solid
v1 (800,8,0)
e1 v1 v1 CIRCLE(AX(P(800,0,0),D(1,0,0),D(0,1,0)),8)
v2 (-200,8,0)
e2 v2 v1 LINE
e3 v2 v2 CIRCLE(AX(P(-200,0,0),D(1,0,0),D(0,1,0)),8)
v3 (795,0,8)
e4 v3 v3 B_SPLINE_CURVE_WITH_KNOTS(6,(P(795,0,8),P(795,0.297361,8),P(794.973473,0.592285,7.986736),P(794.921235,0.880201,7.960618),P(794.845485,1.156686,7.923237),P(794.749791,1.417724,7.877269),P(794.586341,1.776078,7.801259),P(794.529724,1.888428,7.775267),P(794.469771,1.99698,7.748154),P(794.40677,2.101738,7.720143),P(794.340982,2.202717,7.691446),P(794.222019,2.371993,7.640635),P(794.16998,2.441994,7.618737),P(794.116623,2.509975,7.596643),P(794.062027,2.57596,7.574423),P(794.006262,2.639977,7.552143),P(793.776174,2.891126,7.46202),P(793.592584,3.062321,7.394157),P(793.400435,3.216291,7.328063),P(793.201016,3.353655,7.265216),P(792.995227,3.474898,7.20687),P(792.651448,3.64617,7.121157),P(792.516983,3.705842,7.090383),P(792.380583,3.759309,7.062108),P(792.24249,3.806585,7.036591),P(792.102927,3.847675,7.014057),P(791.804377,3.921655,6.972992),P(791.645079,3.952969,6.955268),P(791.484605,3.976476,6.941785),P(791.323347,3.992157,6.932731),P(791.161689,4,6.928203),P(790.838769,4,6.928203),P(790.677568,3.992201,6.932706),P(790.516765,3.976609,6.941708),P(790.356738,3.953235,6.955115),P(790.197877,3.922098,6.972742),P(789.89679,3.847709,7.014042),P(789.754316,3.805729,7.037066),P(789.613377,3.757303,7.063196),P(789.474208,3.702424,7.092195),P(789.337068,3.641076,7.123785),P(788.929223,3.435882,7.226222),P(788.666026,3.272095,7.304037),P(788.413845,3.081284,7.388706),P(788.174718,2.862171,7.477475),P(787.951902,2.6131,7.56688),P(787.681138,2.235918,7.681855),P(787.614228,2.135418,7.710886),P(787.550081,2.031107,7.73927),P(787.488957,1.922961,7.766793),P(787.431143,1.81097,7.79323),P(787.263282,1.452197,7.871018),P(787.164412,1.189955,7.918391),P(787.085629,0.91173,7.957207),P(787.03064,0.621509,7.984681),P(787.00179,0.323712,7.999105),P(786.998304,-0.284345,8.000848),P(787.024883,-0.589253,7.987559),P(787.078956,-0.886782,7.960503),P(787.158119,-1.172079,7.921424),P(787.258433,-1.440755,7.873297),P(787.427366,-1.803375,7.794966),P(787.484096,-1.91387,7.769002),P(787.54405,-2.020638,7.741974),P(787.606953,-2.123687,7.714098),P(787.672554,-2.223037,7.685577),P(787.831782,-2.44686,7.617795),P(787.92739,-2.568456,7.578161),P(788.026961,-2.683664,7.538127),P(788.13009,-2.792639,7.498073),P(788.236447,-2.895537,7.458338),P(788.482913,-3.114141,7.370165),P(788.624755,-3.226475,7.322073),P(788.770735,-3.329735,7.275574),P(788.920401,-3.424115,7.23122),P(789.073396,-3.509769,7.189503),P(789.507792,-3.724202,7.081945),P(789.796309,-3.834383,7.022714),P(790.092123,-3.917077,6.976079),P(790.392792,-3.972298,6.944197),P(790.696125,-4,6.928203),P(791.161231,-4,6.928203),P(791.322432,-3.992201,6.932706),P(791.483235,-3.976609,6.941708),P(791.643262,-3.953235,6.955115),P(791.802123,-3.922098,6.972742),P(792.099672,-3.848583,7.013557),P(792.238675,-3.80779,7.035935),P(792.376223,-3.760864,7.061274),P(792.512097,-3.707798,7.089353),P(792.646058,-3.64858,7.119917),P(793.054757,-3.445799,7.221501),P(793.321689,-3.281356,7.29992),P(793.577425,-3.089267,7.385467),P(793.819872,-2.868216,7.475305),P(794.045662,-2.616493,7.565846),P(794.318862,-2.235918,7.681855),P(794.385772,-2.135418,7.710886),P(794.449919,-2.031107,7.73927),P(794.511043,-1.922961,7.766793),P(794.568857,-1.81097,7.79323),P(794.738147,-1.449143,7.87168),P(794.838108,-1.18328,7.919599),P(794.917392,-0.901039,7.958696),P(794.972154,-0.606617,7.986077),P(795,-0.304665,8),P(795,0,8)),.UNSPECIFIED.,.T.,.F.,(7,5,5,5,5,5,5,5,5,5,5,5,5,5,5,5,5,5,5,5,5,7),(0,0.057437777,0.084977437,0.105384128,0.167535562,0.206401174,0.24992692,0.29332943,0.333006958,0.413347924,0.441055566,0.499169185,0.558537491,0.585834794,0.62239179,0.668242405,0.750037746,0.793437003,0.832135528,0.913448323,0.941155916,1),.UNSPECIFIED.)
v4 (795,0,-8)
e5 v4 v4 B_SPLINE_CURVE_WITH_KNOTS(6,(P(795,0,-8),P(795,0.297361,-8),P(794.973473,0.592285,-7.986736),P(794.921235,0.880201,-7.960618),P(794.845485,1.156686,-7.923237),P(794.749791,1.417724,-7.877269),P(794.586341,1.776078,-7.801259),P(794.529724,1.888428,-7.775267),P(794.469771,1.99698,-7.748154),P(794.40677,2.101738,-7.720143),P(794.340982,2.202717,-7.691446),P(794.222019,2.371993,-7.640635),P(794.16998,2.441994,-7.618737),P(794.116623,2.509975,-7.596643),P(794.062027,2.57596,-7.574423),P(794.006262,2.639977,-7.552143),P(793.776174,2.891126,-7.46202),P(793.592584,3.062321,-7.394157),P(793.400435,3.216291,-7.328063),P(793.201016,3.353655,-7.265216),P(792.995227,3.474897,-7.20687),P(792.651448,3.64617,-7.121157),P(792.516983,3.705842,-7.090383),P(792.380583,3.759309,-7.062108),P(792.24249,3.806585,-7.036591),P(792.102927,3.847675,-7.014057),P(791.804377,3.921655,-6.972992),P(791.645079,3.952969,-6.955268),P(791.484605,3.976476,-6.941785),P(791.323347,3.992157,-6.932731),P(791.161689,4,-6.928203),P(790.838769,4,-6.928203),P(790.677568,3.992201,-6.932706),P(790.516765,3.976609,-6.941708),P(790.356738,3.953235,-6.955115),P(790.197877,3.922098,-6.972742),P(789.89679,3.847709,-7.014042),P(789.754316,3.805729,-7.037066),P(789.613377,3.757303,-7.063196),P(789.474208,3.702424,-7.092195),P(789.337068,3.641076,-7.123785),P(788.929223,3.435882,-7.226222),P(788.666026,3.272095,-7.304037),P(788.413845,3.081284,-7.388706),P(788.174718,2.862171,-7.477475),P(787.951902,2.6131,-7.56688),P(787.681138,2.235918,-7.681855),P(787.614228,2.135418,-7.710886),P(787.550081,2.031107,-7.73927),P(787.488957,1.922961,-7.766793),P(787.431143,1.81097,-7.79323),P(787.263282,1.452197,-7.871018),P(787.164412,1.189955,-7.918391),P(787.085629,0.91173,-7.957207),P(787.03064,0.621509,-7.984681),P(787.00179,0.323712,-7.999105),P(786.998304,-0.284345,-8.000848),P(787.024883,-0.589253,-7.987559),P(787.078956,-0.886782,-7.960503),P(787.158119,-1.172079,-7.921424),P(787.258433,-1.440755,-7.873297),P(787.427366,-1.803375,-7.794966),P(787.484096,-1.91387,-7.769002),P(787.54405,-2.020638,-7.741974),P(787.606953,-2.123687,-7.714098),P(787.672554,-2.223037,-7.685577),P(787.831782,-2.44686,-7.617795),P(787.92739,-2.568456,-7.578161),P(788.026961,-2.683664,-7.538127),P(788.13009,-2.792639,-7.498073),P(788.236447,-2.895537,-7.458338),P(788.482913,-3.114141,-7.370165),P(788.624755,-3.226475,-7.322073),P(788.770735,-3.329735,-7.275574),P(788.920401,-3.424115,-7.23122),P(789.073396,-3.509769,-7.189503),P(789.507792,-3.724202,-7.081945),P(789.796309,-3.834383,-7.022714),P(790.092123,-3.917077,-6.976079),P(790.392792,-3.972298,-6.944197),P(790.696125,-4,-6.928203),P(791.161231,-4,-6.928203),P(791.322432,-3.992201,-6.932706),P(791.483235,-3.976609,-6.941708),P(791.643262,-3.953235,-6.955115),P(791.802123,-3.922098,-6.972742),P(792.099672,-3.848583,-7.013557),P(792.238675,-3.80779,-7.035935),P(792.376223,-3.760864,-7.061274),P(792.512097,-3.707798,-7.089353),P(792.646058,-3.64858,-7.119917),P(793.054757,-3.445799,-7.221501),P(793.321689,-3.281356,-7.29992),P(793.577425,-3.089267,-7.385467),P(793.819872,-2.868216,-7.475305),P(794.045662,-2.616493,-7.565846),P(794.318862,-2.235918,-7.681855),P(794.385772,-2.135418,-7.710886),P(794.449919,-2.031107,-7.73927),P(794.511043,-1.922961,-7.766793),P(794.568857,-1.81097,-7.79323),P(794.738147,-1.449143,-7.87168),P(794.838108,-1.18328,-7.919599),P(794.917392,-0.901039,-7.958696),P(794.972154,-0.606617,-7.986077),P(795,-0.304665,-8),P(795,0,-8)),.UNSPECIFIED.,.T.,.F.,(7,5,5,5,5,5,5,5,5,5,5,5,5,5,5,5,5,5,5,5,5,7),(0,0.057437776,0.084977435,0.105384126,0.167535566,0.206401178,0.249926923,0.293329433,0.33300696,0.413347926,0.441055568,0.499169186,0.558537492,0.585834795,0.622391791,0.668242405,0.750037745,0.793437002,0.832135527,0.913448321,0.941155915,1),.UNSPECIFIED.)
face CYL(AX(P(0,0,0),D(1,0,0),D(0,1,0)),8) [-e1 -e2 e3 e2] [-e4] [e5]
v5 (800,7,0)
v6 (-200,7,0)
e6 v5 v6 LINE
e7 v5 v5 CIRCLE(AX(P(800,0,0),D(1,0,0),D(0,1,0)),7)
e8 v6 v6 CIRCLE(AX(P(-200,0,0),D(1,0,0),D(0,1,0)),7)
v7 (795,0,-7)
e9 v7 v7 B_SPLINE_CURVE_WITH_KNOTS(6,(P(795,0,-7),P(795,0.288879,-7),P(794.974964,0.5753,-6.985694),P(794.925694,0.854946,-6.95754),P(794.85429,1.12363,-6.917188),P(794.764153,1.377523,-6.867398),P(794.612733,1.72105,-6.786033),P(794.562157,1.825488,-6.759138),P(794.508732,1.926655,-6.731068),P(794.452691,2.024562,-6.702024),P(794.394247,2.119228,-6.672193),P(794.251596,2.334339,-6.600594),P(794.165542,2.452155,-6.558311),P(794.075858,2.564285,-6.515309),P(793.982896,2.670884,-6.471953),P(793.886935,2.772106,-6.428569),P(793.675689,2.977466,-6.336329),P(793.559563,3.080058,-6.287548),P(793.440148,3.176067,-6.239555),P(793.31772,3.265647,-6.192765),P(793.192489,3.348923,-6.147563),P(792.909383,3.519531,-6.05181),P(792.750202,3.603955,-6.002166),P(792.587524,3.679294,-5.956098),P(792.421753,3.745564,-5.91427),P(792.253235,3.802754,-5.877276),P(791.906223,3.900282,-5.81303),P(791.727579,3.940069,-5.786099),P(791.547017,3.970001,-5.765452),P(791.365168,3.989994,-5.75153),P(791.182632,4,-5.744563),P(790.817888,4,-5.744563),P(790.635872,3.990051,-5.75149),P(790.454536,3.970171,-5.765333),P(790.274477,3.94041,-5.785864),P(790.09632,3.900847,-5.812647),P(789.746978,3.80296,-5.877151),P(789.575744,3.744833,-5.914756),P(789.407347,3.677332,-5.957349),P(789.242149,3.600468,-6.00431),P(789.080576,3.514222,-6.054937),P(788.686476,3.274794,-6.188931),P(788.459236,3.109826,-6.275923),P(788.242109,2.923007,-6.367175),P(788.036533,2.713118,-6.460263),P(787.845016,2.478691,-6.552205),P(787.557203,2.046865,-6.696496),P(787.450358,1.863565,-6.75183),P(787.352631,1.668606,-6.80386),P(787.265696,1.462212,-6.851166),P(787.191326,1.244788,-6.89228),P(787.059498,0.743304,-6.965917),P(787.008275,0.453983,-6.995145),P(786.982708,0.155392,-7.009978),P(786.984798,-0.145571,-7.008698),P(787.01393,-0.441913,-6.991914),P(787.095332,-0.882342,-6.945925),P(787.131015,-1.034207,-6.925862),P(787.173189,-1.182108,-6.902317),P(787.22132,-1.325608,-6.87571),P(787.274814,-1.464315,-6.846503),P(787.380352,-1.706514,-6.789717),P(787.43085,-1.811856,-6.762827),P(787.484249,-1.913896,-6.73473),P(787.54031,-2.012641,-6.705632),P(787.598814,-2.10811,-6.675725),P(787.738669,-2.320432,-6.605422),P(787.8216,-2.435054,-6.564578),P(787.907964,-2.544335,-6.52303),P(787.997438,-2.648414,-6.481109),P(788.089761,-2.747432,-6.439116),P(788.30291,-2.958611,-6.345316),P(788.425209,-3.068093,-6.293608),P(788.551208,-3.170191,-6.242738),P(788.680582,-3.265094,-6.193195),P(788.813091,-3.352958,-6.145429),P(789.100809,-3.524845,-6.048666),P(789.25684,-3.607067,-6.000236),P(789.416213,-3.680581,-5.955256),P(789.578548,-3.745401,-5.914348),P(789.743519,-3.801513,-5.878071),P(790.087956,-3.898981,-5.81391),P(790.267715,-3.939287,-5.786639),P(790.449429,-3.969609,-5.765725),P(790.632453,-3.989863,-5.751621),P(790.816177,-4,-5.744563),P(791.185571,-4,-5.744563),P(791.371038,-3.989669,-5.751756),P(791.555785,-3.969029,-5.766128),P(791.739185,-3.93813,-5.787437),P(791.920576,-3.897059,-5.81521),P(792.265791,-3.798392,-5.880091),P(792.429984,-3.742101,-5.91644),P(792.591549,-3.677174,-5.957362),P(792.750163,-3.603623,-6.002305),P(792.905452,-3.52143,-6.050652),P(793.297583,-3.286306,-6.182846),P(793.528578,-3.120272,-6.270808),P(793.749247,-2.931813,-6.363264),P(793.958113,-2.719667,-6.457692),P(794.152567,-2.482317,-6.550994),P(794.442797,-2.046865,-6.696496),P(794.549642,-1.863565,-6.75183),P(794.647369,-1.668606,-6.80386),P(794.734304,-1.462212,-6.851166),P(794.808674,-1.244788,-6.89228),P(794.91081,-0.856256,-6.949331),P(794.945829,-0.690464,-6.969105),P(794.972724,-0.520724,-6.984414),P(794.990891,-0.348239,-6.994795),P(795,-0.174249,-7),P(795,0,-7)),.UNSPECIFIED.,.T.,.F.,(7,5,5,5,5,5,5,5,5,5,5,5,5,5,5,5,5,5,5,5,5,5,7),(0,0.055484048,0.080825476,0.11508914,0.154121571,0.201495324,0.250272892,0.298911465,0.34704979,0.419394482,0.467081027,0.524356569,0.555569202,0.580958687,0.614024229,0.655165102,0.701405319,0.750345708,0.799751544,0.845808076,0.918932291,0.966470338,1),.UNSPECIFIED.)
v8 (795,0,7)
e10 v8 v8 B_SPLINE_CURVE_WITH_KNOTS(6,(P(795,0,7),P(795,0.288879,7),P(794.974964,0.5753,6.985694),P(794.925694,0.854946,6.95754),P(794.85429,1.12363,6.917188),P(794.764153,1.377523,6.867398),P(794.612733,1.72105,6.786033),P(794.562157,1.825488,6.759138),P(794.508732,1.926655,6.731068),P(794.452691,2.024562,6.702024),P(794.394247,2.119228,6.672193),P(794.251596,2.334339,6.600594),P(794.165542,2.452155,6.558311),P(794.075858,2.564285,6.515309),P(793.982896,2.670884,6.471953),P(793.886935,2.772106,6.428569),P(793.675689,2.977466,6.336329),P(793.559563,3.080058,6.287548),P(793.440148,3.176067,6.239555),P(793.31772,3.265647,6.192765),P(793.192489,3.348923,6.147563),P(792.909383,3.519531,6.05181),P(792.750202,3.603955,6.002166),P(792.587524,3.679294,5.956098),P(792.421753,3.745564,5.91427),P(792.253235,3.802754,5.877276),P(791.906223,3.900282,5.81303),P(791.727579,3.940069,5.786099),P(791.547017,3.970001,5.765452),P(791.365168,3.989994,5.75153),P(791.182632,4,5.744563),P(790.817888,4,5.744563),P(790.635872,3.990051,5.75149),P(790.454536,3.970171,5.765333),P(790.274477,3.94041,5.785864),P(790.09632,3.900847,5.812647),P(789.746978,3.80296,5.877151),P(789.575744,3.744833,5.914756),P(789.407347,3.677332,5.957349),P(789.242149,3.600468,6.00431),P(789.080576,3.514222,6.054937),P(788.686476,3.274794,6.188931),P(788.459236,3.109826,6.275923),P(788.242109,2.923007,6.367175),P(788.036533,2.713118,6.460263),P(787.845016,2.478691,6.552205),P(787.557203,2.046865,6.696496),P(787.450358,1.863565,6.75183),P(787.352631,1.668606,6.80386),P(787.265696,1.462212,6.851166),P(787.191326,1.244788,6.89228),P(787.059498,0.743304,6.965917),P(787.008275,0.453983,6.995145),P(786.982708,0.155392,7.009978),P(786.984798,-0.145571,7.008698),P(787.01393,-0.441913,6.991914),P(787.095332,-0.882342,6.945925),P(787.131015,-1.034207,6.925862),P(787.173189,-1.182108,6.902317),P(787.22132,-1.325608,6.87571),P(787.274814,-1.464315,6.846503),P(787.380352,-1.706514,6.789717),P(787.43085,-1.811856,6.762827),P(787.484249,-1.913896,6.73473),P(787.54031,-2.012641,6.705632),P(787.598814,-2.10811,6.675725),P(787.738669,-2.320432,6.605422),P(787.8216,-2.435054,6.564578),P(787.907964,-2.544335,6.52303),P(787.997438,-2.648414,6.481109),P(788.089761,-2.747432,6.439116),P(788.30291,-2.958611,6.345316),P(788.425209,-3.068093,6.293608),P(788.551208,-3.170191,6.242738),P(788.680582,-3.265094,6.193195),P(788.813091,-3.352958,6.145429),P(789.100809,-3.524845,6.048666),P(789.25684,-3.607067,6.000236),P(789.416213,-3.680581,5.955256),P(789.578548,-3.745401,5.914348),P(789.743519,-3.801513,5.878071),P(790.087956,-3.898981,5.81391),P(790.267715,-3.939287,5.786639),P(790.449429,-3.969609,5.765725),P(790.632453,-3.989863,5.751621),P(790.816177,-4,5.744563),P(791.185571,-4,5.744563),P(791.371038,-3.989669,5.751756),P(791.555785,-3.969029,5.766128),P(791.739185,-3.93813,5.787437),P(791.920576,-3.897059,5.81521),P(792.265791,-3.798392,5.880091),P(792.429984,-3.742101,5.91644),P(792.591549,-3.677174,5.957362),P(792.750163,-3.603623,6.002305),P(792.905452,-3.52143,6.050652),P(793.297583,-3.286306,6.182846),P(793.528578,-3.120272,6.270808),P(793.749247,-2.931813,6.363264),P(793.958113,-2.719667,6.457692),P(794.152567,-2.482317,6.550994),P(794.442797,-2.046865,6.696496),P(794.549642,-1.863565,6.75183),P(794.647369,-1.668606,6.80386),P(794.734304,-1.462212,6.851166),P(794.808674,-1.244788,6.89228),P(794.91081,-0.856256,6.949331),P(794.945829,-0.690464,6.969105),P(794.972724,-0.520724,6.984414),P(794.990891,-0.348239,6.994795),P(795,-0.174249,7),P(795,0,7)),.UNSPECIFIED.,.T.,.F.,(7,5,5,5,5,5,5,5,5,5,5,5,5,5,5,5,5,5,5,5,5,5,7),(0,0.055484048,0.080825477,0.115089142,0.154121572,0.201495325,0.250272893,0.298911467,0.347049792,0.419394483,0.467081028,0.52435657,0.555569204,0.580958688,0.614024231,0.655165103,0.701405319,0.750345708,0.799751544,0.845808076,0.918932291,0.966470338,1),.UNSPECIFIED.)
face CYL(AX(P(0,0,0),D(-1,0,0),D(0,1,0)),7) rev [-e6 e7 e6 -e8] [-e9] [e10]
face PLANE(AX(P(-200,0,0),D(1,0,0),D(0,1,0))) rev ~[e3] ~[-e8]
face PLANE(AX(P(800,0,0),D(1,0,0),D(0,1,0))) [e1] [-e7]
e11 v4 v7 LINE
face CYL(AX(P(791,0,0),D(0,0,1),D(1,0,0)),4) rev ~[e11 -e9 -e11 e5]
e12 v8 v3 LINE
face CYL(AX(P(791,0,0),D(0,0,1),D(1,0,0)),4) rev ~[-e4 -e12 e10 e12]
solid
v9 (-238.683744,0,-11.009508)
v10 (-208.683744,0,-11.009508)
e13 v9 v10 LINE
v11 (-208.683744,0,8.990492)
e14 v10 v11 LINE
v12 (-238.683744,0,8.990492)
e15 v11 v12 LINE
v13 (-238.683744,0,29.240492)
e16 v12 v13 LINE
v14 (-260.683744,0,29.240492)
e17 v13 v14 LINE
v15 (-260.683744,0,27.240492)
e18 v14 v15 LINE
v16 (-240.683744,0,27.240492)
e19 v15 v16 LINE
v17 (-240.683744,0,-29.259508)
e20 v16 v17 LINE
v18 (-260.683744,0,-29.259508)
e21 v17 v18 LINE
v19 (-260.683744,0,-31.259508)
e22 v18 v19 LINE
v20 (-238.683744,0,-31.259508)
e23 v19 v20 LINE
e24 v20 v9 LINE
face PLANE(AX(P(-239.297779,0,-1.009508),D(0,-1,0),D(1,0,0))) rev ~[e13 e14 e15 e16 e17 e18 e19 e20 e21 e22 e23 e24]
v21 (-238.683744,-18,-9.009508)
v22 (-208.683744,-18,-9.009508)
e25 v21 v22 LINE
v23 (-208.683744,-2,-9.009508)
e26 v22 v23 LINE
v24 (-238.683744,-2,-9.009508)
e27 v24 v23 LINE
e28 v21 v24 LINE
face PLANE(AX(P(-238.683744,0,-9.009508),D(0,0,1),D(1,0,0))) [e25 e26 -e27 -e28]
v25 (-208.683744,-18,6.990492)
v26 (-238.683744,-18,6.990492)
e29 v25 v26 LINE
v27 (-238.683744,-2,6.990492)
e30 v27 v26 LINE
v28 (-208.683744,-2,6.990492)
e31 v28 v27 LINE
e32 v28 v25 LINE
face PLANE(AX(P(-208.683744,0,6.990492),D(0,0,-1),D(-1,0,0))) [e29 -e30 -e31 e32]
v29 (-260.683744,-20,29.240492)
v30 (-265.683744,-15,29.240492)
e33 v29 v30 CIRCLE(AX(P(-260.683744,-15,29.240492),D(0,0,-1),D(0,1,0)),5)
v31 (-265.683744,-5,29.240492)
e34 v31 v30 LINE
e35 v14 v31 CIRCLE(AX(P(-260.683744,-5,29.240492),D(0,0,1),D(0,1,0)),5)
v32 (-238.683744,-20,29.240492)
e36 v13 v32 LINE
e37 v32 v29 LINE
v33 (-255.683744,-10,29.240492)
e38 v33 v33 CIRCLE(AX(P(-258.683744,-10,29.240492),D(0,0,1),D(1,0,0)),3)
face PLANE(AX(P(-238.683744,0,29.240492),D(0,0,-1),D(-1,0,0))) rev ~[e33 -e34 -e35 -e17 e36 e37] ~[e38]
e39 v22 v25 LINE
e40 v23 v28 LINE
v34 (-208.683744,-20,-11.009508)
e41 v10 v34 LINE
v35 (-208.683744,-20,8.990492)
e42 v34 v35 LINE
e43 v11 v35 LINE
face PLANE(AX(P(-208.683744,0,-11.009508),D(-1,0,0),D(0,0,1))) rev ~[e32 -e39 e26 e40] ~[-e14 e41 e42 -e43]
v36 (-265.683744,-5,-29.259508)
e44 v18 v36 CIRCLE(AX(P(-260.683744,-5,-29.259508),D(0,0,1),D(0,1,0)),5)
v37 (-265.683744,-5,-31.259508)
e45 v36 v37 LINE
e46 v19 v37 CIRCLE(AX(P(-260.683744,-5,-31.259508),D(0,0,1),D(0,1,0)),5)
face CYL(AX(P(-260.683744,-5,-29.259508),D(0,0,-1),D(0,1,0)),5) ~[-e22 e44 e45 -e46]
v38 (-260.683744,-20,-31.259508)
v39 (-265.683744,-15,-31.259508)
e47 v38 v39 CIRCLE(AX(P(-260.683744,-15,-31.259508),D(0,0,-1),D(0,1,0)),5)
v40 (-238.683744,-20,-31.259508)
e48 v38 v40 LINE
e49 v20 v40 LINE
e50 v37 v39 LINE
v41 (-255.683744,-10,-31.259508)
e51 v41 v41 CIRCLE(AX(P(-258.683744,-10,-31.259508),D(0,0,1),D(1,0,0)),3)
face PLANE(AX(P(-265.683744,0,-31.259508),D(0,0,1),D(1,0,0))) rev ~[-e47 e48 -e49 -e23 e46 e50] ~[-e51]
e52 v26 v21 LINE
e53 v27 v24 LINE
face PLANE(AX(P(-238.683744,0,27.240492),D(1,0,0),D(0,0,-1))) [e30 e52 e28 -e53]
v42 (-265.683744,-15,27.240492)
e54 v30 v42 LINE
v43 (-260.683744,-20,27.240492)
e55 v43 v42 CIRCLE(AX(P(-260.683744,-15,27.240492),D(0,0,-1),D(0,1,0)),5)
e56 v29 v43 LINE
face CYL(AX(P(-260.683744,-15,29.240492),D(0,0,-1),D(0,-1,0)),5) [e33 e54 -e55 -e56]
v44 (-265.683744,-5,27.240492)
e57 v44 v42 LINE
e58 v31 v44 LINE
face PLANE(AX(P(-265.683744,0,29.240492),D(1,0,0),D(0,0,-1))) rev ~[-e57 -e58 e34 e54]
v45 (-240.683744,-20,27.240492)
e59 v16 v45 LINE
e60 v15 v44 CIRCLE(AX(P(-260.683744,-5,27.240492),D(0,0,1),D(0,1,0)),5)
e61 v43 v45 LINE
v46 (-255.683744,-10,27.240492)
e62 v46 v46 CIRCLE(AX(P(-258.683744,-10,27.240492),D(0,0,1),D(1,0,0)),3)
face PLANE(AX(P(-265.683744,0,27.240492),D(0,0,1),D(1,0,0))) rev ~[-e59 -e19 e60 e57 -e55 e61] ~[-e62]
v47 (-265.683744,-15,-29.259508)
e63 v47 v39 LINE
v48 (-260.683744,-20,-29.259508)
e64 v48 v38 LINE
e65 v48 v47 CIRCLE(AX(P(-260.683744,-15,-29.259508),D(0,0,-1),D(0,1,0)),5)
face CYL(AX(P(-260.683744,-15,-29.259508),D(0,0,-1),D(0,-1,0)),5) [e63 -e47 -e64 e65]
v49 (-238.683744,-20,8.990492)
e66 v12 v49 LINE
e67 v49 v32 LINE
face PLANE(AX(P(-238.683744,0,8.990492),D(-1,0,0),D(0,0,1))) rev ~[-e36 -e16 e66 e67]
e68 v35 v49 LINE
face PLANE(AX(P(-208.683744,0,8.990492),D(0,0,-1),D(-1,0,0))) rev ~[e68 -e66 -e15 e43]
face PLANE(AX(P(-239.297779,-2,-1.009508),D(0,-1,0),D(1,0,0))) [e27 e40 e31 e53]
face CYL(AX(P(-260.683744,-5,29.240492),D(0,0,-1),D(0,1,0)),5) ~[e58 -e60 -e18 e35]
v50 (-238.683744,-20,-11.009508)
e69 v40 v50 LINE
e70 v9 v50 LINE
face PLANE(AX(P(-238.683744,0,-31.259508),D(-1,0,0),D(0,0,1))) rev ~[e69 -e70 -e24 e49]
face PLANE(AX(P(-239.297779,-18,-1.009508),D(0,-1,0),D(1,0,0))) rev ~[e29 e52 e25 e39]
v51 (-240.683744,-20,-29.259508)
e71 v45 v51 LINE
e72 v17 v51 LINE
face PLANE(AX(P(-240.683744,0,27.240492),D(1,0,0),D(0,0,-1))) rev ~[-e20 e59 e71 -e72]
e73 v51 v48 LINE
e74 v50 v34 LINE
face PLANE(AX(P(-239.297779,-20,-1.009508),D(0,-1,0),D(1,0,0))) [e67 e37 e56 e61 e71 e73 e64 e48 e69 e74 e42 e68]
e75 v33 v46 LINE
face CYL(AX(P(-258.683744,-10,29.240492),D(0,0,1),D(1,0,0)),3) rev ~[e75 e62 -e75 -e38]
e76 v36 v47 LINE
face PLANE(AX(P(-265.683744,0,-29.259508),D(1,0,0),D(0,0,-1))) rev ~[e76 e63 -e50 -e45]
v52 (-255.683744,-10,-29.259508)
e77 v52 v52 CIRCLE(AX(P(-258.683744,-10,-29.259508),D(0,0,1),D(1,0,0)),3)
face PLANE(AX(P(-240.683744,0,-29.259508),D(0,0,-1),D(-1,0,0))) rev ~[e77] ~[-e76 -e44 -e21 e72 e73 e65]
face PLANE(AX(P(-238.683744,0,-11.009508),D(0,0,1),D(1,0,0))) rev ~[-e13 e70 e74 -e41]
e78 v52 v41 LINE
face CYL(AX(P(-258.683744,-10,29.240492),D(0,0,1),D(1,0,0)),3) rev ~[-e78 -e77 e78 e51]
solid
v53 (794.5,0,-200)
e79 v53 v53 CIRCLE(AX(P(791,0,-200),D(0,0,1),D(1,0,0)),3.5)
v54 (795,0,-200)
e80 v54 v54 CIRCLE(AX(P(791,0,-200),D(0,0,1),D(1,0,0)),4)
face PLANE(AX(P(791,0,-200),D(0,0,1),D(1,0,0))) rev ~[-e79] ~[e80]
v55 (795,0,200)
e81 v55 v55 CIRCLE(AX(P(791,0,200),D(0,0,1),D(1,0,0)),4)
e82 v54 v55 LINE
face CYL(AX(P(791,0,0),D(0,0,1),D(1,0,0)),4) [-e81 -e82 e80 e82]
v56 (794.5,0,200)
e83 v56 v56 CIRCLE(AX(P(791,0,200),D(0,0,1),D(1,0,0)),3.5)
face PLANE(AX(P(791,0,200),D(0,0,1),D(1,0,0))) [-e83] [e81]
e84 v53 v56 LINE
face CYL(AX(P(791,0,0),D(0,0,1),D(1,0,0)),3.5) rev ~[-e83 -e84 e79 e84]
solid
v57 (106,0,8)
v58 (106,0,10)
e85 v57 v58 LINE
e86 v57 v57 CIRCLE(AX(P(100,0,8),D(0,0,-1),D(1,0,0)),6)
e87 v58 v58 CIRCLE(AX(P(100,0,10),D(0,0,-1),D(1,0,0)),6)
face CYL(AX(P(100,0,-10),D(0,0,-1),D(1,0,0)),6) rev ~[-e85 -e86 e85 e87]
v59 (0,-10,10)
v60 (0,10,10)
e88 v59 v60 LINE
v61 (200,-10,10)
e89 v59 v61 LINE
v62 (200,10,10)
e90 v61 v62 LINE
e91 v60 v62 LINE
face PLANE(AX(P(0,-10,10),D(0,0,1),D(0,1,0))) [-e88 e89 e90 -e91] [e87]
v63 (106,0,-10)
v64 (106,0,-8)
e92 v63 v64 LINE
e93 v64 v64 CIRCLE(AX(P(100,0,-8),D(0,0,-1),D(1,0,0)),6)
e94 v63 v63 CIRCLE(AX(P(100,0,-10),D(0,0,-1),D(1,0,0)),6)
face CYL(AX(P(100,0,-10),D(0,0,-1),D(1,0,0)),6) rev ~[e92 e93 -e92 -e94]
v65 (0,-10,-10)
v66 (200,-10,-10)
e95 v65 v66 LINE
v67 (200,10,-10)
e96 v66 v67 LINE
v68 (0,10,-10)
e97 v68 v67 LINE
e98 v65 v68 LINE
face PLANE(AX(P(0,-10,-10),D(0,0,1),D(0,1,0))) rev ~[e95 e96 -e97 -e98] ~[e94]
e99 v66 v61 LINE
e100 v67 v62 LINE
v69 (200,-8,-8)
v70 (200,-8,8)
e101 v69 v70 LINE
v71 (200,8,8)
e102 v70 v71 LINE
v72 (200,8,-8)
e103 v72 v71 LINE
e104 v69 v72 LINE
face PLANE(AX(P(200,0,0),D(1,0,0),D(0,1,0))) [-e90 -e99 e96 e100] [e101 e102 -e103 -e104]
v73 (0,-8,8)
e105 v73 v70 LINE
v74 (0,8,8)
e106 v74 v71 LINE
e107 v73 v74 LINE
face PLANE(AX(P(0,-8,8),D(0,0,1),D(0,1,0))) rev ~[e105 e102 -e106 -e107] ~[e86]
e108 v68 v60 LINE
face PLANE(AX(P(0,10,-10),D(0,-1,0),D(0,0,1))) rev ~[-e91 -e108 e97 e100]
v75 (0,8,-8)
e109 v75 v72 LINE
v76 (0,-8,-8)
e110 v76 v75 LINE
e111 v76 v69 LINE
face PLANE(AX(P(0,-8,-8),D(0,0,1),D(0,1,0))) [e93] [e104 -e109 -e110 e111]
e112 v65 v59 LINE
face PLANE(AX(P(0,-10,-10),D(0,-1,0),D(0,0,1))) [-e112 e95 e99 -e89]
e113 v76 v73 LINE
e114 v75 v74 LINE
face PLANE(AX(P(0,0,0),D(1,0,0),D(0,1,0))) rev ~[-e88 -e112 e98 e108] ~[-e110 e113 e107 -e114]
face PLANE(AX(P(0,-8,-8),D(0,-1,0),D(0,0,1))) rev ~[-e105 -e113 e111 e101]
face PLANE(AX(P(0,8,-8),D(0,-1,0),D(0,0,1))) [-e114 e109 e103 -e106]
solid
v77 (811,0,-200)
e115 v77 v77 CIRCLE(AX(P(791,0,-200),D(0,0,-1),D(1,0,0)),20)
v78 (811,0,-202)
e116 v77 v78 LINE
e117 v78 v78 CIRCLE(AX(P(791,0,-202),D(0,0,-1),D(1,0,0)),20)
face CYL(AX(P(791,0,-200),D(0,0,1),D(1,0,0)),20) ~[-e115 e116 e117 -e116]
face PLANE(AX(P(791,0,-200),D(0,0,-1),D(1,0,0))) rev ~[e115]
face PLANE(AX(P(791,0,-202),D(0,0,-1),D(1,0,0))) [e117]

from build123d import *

# Parameters (mm, degrees)
F0_W          = 20
F0_H          = 20
F0_W_2        = 16
F0_H_2        = 16
F1_DEPTH      = 200
F2_R          = 8
F2_R_2        = 7
F3_DEPTH      = 800
F3_DEPTH_BACK = 200
F4_R          = 6
F5_DEPTH      = 25
F6_R          = 4
F7_DEPTH      = 12.5
F8_DEPTH      = 200
F9_T          = -0.5
F10_R         = 20
F11_DEPTH     = 2
F13_DEPTH     = 20
F14_T         = -2
F15_R         = 3
F16_DEPTH     = 231.2414921874
F17_R         = 5


with BuildPart() as f1:
    # F0 (on Right) → F1 (new body)
    with BuildSketch(Plane.YZ):
        Rectangle(F0_W, F0_H)
        Rectangle(F0_W_2, F0_H_2, mode=Mode.SUBTRACT)
    extrude(amount=F1_DEPTH)

    # F4 (on face) → F5 (cut)
    with BuildSketch(Plane(origin=(0, 0, -10), x_dir=(1, 0, 0), z_dir=(0, 0, -1))):
        with Locations((100, 0)):
            Circle(F4_R)
    extrude(amount=-F5_DEPTH, mode=Mode.SUBTRACT)


with BuildPart() as f3:
    # F2 (on Right) → F3 (new body, two sides)
    with BuildSketch(Plane.YZ) as f3_sk:
        Circle(F2_R)
        Circle(F2_R_2, mode=Mode.SUBTRACT)
    extrude(amount=F3_DEPTH)
    extrude(f3_sk.sketch, amount=-F3_DEPTH_BACK)

    # F6 (on Top) → F7 (cut, symmetric)
    with BuildSketch(Plane.XY):
        with Locations((791, 0)):
            Circle(F6_R)
    extrude(amount=F7_DEPTH, both=True, mode=Mode.SUBTRACT)


with BuildPart() as f8:
    # F6 (on Top) → F8 (new body, symmetric)
    with BuildSketch(Plane.XY):
        with Locations((791, 0)):
            Circle(F6_R)
    extrude(amount=F8_DEPTH, both=True)

    # F9
    f9_openings = [f8.faces().sort_by_distance(p)[0] for p in [
        (791, 0, 200),
        (791, 0, -200),
    ]]
    offset(amount=F9_T, openings=f9_openings)


with BuildPart() as f11:
    # F10 (on face) → F11 (new body)
    with BuildSketch(Plane(origin=(0, 0, -200), x_dir=(1, 0, 0), z_dir=(0, 0, -1))):
        with Locations((791, 0)):
            Circle(F10_R)
    extrude(amount=F11_DEPTH)


with BuildPart() as f13:
    # F12 (on Front) → F13 (new body)
    with BuildSketch(Plane.XZ):
        Polygon((-238.6837440729, -11.0095078126), (-208.6837440729, -11.0095078126), (-208.6837440729, 8.9904921874), (-238.6837440729, 8.9904921874), (-238.6837440729, 29.2404921874), (-265.6837440729, 29.2404921874), (-265.6837440729, 27.2404921874), (-240.6837440729, 27.2404921874), (-240.6837440729, -29.2595078126), (-265.6837440729, -29.2595078126), (-265.6837440729, -31.2595078126), (-238.6837440729, -31.2595078126), align=None)
    extrude(amount=F13_DEPTH)

    # F14
    f14_openings = [f13.faces().sort_by_distance(p)[0] for p in [
        (-208.683744, -10, -1.009508),
    ]]
    offset(amount=F14_T, openings=f14_openings, kind=Kind.INTERSECTION)

    # F15 (on face) → F16 (cut, through all)
    with BuildSketch(Plane.XY.offset(29.2404921874)):
        with Locations((-258.6837440729, -10)):
            Circle(F15_R)
    extrude(amount=-F16_DEPTH, mode=Mode.SUBTRACT)

    # F17
    f17_edges = [f13.edges().sort_by_distance(p)[0] for p in [
        (-265.683744, -20, 28.240492),
        (-265.683744, 0, 28.240492),
        (-265.683744, -20, -30.259508),
        (-265.683744, 0, -30.259508),
    ]]
    fillet(f17_edges, radius=F17_R)


solid = Compound([f1.part, f3.part, f8.part, f11.part, f13.part])
